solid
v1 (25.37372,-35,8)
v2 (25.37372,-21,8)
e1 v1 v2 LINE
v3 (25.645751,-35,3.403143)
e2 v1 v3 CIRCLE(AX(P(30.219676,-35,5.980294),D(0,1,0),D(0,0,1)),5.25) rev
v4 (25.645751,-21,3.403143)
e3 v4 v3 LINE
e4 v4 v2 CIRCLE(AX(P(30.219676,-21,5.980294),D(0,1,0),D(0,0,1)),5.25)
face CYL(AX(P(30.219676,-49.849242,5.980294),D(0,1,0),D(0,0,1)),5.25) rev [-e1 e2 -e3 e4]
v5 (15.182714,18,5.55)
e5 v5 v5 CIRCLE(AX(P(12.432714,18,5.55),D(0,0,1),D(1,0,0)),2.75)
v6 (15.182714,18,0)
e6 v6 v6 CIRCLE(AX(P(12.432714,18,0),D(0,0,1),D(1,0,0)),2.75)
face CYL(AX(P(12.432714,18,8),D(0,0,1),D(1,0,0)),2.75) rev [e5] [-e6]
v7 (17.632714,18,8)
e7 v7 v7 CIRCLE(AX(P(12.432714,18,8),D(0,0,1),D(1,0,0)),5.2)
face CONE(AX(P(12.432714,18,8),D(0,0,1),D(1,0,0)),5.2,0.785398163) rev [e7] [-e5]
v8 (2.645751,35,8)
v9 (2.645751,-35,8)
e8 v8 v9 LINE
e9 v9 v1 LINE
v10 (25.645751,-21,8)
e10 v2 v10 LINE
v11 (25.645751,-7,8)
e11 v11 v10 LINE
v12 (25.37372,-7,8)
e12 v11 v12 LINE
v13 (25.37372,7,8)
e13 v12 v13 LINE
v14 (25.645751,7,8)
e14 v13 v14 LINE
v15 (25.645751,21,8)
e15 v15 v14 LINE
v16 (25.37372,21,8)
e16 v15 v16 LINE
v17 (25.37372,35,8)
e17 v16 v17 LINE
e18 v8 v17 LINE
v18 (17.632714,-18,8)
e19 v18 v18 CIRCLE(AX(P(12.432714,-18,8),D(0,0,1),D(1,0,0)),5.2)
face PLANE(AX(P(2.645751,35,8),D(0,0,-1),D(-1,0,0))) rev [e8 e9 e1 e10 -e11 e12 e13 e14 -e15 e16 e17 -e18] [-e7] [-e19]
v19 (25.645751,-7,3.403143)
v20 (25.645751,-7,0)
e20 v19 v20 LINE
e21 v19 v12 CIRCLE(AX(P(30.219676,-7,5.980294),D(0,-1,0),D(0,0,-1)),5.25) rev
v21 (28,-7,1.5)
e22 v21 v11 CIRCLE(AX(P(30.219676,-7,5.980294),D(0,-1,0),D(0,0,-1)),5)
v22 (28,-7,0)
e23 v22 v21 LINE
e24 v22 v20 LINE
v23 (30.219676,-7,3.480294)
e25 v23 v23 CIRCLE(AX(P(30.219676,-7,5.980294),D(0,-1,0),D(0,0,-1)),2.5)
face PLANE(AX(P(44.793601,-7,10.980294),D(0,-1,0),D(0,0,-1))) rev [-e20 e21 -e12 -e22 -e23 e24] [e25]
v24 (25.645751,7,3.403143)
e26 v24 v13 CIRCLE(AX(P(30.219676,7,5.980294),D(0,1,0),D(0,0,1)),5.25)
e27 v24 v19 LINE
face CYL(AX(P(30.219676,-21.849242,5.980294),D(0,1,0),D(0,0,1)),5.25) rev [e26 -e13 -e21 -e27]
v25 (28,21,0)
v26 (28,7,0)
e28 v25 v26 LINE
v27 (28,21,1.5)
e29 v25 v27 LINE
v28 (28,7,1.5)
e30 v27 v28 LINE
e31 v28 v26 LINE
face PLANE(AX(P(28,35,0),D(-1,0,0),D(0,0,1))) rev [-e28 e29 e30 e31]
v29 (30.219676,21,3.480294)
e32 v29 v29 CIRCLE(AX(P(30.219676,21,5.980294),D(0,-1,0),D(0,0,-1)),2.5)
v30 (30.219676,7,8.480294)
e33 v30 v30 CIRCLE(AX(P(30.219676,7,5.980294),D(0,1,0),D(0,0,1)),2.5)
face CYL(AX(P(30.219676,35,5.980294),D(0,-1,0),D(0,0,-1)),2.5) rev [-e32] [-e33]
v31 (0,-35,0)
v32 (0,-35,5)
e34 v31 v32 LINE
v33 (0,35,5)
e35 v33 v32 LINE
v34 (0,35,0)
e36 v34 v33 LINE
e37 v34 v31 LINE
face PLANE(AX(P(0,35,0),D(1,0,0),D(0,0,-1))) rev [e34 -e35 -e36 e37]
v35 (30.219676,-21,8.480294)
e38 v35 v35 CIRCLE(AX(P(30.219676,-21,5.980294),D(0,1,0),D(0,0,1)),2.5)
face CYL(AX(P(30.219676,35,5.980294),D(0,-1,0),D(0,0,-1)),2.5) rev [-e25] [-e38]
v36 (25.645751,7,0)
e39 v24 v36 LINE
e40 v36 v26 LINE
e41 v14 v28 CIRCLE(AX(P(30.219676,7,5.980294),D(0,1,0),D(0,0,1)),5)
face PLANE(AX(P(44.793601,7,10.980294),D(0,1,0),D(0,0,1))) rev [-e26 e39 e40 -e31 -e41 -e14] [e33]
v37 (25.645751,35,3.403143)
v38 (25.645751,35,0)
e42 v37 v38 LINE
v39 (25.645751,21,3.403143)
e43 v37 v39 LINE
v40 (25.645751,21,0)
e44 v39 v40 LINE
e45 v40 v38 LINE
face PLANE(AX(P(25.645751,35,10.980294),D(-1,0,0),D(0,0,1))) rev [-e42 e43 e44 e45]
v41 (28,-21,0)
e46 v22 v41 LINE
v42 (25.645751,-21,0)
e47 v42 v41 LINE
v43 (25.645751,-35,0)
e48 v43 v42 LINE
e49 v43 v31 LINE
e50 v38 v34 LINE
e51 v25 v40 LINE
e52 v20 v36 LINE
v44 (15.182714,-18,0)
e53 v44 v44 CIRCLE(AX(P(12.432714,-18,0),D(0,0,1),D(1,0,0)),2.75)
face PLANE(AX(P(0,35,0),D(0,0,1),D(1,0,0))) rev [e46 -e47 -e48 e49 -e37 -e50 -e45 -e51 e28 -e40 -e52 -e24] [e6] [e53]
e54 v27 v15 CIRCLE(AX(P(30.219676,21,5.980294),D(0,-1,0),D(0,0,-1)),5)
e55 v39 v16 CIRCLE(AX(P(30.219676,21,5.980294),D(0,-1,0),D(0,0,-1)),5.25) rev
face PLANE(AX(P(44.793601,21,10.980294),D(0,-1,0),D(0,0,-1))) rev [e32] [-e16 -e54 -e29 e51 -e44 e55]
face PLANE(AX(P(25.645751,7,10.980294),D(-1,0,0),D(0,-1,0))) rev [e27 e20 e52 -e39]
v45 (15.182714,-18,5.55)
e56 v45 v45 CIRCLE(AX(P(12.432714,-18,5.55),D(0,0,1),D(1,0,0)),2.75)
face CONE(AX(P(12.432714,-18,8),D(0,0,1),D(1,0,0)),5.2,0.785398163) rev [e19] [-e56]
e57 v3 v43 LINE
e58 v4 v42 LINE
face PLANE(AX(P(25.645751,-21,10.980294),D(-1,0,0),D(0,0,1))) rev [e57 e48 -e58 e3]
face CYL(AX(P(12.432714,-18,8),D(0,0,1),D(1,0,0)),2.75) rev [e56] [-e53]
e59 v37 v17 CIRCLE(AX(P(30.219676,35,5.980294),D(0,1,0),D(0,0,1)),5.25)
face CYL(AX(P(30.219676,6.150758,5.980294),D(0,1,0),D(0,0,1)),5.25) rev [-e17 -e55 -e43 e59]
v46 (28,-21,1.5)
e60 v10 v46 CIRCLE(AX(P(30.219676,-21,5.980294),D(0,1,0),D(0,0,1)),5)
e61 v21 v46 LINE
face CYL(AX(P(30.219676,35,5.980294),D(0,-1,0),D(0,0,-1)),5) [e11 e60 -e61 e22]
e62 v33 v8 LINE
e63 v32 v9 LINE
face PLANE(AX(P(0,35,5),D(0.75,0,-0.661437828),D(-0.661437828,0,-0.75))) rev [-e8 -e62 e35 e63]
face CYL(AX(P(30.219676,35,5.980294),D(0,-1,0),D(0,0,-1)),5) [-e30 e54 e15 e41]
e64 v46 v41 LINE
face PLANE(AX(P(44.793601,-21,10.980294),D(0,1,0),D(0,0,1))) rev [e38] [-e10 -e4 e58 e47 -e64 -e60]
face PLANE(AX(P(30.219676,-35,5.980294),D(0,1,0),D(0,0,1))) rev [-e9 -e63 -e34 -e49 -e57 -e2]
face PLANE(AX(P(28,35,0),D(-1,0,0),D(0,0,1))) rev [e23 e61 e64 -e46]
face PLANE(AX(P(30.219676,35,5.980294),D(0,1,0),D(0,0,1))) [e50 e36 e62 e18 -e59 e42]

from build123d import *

# Parameters (mm, degrees)
SKETCH1_R                                       = 2.5
BOSS_EXTRUDE1_DEPTH                             = 35
CUT_EXTRUDE1_OUTLINE_W                          = 11.354248689
CUT_EXTRUDE1_OUTLINE_H                          = 14
CUT_EXTRUDE1_DEPTH                              = 10.980294351
CSK_FOR_M5_FLAT_HEAD_MACHINE_SCREW1_D           = 5.5
CSK_FOR_M5_FLAT_HEAD_MACHINE_SCREW1_DEPTH       = 13.347633298
CSK_FOR_M5_FLAT_HEAD_MACHINE_SCREW1_CSINK_D     = 10.4
CSK_FOR_M5_FLAT_HEAD_MACHINE_SCREW1_CSINK_ANGLE = 90
CSK_FOR_M5_FLAT_HEAD_MACHINE_SCREW1_TIP         = 1.652366702
SKETCH6_R                                       = 5.25
CUT_EXTRUDE2_DEPTH                              = 14
CUT_EXTRUDE3_START                              = -28
SKETCH6_2_R                                     = 5.25
CUT_EXTRUDE3_DEPTH                              = 14
CUT_EXTRUDE4_START                              = -56
SKETCH6_3_R                                     = 5.25
CUT_EXTRUDE4_DEPTH                              = 14


# Read off the part's stored shape, not the designer's step: Cut-Extrude1
with BuildPart() as part:
    # Sketch1 → Boss-Extrude1 (new, symmetric)
    with BuildSketch(Plane(origin=(0, 0, 0), x_dir=(1, 0, 0), z_dir=(0, 1, 0))):
        with BuildLine():
            Line((0, 0), (28, 0))
            Line((28, 0), (28, -1.5))
            ThreePointArc((28, -1.5), (34.920820135, -7.683011565), (25.645751311, -8))
            Line((25.645751311, -8), (2.645751311, -8))
            Line((2.645751311, -8), (0, -5))
            Line((0, -5), (0, 0))
        make_face()
        with Locations(Location((30.219676222, -5.980294351, 0), (0, 0, 270))):
            Circle(SKETCH1_R, mode=Mode.SUBTRACT)
    extrude(amount=BOSS_EXTRUDE1_DEPTH, both=True)

    # Cut-Extrude1 outline → Cut-Extrude1 (cut)
    with BuildSketch(Plane.XY):
        with Locations((31.322875655, 0)):
            Rectangle(CUT_EXTRUDE1_OUTLINE_W, CUT_EXTRUDE1_OUTLINE_H)
        with Locations((31.322875655, 28)):
            Rectangle(CUT_EXTRUDE1_OUTLINE_W, CUT_EXTRUDE1_OUTLINE_H)
        with Locations((31.322875655, -28)):
            Rectangle(CUT_EXTRUDE1_OUTLINE_W, CUT_EXTRUDE1_OUTLINE_H)
    extrude(amount=CUT_EXTRUDE1_DEPTH, mode=Mode.SUBTRACT)

    # CSK for M5 Flat Head Machine Screw1
    with Locations(Plane.XY.offset(8)):
        with Locations((12.432713767, 18), (12.432713767, -18)):
            CounterSinkHole(CSK_FOR_M5_FLAT_HEAD_MACHINE_SCREW1_D / 2, CSK_FOR_M5_FLAT_HEAD_MACHINE_SCREW1_CSINK_D / 2, depth=CSK_FOR_M5_FLAT_HEAD_MACHINE_SCREW1_DEPTH, counter_sink_angle=CSK_FOR_M5_FLAT_HEAD_MACHINE_SCREW1_CSINK_ANGLE)
            with Locations((0, 0, -(CSK_FOR_M5_FLAT_HEAD_MACHINE_SCREW1_DEPTH + CSK_FOR_M5_FLAT_HEAD_MACHINE_SCREW1_TIP / 2))):  # 118° drill point
                Cone(0, CSK_FOR_M5_FLAT_HEAD_MACHINE_SCREW1_D / 2, CSK_FOR_M5_FLAT_HEAD_MACHINE_SCREW1_TIP, mode=Mode.SUBTRACT)

    # Sketch6 → Cut-Extrude2 (cut)
    with BuildSketch(Plane(origin=(0, 35, 0), x_dir=(1, 0, 0), z_dir=(0, 1, 0))):
        with Locations((30.219676222, -5.980294351)):
            Circle(SKETCH6_R)
    extrude(amount=-CUT_EXTRUDE2_DEPTH, mode=Mode.SUBTRACT)

    # Sketch6<2> → Cut-Extrude3 (cut)
    with BuildSketch(Plane(origin=(0, 35, 0), x_dir=(1, 0, 0), z_dir=(0, 1, 0)).offset(CUT_EXTRUDE3_START)):
        with Locations((30.219676222, -5.980294351)):
            Circle(SKETCH6_2_R)
    extrude(amount=-CUT_EXTRUDE3_DEPTH, mode=Mode.SUBTRACT)

    # Sketch6<3> → Cut-Extrude4 (cut)
    with BuildSketch(Plane(origin=(0, 35, 0), x_dir=(1, 0, 0), z_dir=(0, 1, 0)).offset(CUT_EXTRUDE4_START)):
        with Locations((30.219676222, -5.980294351)):
            Circle(SKETCH6_3_R)
    extrude(amount=-CUT_EXTRUDE4_DEPTH, mode=Mode.SUBTRACT)


solid = part.part
